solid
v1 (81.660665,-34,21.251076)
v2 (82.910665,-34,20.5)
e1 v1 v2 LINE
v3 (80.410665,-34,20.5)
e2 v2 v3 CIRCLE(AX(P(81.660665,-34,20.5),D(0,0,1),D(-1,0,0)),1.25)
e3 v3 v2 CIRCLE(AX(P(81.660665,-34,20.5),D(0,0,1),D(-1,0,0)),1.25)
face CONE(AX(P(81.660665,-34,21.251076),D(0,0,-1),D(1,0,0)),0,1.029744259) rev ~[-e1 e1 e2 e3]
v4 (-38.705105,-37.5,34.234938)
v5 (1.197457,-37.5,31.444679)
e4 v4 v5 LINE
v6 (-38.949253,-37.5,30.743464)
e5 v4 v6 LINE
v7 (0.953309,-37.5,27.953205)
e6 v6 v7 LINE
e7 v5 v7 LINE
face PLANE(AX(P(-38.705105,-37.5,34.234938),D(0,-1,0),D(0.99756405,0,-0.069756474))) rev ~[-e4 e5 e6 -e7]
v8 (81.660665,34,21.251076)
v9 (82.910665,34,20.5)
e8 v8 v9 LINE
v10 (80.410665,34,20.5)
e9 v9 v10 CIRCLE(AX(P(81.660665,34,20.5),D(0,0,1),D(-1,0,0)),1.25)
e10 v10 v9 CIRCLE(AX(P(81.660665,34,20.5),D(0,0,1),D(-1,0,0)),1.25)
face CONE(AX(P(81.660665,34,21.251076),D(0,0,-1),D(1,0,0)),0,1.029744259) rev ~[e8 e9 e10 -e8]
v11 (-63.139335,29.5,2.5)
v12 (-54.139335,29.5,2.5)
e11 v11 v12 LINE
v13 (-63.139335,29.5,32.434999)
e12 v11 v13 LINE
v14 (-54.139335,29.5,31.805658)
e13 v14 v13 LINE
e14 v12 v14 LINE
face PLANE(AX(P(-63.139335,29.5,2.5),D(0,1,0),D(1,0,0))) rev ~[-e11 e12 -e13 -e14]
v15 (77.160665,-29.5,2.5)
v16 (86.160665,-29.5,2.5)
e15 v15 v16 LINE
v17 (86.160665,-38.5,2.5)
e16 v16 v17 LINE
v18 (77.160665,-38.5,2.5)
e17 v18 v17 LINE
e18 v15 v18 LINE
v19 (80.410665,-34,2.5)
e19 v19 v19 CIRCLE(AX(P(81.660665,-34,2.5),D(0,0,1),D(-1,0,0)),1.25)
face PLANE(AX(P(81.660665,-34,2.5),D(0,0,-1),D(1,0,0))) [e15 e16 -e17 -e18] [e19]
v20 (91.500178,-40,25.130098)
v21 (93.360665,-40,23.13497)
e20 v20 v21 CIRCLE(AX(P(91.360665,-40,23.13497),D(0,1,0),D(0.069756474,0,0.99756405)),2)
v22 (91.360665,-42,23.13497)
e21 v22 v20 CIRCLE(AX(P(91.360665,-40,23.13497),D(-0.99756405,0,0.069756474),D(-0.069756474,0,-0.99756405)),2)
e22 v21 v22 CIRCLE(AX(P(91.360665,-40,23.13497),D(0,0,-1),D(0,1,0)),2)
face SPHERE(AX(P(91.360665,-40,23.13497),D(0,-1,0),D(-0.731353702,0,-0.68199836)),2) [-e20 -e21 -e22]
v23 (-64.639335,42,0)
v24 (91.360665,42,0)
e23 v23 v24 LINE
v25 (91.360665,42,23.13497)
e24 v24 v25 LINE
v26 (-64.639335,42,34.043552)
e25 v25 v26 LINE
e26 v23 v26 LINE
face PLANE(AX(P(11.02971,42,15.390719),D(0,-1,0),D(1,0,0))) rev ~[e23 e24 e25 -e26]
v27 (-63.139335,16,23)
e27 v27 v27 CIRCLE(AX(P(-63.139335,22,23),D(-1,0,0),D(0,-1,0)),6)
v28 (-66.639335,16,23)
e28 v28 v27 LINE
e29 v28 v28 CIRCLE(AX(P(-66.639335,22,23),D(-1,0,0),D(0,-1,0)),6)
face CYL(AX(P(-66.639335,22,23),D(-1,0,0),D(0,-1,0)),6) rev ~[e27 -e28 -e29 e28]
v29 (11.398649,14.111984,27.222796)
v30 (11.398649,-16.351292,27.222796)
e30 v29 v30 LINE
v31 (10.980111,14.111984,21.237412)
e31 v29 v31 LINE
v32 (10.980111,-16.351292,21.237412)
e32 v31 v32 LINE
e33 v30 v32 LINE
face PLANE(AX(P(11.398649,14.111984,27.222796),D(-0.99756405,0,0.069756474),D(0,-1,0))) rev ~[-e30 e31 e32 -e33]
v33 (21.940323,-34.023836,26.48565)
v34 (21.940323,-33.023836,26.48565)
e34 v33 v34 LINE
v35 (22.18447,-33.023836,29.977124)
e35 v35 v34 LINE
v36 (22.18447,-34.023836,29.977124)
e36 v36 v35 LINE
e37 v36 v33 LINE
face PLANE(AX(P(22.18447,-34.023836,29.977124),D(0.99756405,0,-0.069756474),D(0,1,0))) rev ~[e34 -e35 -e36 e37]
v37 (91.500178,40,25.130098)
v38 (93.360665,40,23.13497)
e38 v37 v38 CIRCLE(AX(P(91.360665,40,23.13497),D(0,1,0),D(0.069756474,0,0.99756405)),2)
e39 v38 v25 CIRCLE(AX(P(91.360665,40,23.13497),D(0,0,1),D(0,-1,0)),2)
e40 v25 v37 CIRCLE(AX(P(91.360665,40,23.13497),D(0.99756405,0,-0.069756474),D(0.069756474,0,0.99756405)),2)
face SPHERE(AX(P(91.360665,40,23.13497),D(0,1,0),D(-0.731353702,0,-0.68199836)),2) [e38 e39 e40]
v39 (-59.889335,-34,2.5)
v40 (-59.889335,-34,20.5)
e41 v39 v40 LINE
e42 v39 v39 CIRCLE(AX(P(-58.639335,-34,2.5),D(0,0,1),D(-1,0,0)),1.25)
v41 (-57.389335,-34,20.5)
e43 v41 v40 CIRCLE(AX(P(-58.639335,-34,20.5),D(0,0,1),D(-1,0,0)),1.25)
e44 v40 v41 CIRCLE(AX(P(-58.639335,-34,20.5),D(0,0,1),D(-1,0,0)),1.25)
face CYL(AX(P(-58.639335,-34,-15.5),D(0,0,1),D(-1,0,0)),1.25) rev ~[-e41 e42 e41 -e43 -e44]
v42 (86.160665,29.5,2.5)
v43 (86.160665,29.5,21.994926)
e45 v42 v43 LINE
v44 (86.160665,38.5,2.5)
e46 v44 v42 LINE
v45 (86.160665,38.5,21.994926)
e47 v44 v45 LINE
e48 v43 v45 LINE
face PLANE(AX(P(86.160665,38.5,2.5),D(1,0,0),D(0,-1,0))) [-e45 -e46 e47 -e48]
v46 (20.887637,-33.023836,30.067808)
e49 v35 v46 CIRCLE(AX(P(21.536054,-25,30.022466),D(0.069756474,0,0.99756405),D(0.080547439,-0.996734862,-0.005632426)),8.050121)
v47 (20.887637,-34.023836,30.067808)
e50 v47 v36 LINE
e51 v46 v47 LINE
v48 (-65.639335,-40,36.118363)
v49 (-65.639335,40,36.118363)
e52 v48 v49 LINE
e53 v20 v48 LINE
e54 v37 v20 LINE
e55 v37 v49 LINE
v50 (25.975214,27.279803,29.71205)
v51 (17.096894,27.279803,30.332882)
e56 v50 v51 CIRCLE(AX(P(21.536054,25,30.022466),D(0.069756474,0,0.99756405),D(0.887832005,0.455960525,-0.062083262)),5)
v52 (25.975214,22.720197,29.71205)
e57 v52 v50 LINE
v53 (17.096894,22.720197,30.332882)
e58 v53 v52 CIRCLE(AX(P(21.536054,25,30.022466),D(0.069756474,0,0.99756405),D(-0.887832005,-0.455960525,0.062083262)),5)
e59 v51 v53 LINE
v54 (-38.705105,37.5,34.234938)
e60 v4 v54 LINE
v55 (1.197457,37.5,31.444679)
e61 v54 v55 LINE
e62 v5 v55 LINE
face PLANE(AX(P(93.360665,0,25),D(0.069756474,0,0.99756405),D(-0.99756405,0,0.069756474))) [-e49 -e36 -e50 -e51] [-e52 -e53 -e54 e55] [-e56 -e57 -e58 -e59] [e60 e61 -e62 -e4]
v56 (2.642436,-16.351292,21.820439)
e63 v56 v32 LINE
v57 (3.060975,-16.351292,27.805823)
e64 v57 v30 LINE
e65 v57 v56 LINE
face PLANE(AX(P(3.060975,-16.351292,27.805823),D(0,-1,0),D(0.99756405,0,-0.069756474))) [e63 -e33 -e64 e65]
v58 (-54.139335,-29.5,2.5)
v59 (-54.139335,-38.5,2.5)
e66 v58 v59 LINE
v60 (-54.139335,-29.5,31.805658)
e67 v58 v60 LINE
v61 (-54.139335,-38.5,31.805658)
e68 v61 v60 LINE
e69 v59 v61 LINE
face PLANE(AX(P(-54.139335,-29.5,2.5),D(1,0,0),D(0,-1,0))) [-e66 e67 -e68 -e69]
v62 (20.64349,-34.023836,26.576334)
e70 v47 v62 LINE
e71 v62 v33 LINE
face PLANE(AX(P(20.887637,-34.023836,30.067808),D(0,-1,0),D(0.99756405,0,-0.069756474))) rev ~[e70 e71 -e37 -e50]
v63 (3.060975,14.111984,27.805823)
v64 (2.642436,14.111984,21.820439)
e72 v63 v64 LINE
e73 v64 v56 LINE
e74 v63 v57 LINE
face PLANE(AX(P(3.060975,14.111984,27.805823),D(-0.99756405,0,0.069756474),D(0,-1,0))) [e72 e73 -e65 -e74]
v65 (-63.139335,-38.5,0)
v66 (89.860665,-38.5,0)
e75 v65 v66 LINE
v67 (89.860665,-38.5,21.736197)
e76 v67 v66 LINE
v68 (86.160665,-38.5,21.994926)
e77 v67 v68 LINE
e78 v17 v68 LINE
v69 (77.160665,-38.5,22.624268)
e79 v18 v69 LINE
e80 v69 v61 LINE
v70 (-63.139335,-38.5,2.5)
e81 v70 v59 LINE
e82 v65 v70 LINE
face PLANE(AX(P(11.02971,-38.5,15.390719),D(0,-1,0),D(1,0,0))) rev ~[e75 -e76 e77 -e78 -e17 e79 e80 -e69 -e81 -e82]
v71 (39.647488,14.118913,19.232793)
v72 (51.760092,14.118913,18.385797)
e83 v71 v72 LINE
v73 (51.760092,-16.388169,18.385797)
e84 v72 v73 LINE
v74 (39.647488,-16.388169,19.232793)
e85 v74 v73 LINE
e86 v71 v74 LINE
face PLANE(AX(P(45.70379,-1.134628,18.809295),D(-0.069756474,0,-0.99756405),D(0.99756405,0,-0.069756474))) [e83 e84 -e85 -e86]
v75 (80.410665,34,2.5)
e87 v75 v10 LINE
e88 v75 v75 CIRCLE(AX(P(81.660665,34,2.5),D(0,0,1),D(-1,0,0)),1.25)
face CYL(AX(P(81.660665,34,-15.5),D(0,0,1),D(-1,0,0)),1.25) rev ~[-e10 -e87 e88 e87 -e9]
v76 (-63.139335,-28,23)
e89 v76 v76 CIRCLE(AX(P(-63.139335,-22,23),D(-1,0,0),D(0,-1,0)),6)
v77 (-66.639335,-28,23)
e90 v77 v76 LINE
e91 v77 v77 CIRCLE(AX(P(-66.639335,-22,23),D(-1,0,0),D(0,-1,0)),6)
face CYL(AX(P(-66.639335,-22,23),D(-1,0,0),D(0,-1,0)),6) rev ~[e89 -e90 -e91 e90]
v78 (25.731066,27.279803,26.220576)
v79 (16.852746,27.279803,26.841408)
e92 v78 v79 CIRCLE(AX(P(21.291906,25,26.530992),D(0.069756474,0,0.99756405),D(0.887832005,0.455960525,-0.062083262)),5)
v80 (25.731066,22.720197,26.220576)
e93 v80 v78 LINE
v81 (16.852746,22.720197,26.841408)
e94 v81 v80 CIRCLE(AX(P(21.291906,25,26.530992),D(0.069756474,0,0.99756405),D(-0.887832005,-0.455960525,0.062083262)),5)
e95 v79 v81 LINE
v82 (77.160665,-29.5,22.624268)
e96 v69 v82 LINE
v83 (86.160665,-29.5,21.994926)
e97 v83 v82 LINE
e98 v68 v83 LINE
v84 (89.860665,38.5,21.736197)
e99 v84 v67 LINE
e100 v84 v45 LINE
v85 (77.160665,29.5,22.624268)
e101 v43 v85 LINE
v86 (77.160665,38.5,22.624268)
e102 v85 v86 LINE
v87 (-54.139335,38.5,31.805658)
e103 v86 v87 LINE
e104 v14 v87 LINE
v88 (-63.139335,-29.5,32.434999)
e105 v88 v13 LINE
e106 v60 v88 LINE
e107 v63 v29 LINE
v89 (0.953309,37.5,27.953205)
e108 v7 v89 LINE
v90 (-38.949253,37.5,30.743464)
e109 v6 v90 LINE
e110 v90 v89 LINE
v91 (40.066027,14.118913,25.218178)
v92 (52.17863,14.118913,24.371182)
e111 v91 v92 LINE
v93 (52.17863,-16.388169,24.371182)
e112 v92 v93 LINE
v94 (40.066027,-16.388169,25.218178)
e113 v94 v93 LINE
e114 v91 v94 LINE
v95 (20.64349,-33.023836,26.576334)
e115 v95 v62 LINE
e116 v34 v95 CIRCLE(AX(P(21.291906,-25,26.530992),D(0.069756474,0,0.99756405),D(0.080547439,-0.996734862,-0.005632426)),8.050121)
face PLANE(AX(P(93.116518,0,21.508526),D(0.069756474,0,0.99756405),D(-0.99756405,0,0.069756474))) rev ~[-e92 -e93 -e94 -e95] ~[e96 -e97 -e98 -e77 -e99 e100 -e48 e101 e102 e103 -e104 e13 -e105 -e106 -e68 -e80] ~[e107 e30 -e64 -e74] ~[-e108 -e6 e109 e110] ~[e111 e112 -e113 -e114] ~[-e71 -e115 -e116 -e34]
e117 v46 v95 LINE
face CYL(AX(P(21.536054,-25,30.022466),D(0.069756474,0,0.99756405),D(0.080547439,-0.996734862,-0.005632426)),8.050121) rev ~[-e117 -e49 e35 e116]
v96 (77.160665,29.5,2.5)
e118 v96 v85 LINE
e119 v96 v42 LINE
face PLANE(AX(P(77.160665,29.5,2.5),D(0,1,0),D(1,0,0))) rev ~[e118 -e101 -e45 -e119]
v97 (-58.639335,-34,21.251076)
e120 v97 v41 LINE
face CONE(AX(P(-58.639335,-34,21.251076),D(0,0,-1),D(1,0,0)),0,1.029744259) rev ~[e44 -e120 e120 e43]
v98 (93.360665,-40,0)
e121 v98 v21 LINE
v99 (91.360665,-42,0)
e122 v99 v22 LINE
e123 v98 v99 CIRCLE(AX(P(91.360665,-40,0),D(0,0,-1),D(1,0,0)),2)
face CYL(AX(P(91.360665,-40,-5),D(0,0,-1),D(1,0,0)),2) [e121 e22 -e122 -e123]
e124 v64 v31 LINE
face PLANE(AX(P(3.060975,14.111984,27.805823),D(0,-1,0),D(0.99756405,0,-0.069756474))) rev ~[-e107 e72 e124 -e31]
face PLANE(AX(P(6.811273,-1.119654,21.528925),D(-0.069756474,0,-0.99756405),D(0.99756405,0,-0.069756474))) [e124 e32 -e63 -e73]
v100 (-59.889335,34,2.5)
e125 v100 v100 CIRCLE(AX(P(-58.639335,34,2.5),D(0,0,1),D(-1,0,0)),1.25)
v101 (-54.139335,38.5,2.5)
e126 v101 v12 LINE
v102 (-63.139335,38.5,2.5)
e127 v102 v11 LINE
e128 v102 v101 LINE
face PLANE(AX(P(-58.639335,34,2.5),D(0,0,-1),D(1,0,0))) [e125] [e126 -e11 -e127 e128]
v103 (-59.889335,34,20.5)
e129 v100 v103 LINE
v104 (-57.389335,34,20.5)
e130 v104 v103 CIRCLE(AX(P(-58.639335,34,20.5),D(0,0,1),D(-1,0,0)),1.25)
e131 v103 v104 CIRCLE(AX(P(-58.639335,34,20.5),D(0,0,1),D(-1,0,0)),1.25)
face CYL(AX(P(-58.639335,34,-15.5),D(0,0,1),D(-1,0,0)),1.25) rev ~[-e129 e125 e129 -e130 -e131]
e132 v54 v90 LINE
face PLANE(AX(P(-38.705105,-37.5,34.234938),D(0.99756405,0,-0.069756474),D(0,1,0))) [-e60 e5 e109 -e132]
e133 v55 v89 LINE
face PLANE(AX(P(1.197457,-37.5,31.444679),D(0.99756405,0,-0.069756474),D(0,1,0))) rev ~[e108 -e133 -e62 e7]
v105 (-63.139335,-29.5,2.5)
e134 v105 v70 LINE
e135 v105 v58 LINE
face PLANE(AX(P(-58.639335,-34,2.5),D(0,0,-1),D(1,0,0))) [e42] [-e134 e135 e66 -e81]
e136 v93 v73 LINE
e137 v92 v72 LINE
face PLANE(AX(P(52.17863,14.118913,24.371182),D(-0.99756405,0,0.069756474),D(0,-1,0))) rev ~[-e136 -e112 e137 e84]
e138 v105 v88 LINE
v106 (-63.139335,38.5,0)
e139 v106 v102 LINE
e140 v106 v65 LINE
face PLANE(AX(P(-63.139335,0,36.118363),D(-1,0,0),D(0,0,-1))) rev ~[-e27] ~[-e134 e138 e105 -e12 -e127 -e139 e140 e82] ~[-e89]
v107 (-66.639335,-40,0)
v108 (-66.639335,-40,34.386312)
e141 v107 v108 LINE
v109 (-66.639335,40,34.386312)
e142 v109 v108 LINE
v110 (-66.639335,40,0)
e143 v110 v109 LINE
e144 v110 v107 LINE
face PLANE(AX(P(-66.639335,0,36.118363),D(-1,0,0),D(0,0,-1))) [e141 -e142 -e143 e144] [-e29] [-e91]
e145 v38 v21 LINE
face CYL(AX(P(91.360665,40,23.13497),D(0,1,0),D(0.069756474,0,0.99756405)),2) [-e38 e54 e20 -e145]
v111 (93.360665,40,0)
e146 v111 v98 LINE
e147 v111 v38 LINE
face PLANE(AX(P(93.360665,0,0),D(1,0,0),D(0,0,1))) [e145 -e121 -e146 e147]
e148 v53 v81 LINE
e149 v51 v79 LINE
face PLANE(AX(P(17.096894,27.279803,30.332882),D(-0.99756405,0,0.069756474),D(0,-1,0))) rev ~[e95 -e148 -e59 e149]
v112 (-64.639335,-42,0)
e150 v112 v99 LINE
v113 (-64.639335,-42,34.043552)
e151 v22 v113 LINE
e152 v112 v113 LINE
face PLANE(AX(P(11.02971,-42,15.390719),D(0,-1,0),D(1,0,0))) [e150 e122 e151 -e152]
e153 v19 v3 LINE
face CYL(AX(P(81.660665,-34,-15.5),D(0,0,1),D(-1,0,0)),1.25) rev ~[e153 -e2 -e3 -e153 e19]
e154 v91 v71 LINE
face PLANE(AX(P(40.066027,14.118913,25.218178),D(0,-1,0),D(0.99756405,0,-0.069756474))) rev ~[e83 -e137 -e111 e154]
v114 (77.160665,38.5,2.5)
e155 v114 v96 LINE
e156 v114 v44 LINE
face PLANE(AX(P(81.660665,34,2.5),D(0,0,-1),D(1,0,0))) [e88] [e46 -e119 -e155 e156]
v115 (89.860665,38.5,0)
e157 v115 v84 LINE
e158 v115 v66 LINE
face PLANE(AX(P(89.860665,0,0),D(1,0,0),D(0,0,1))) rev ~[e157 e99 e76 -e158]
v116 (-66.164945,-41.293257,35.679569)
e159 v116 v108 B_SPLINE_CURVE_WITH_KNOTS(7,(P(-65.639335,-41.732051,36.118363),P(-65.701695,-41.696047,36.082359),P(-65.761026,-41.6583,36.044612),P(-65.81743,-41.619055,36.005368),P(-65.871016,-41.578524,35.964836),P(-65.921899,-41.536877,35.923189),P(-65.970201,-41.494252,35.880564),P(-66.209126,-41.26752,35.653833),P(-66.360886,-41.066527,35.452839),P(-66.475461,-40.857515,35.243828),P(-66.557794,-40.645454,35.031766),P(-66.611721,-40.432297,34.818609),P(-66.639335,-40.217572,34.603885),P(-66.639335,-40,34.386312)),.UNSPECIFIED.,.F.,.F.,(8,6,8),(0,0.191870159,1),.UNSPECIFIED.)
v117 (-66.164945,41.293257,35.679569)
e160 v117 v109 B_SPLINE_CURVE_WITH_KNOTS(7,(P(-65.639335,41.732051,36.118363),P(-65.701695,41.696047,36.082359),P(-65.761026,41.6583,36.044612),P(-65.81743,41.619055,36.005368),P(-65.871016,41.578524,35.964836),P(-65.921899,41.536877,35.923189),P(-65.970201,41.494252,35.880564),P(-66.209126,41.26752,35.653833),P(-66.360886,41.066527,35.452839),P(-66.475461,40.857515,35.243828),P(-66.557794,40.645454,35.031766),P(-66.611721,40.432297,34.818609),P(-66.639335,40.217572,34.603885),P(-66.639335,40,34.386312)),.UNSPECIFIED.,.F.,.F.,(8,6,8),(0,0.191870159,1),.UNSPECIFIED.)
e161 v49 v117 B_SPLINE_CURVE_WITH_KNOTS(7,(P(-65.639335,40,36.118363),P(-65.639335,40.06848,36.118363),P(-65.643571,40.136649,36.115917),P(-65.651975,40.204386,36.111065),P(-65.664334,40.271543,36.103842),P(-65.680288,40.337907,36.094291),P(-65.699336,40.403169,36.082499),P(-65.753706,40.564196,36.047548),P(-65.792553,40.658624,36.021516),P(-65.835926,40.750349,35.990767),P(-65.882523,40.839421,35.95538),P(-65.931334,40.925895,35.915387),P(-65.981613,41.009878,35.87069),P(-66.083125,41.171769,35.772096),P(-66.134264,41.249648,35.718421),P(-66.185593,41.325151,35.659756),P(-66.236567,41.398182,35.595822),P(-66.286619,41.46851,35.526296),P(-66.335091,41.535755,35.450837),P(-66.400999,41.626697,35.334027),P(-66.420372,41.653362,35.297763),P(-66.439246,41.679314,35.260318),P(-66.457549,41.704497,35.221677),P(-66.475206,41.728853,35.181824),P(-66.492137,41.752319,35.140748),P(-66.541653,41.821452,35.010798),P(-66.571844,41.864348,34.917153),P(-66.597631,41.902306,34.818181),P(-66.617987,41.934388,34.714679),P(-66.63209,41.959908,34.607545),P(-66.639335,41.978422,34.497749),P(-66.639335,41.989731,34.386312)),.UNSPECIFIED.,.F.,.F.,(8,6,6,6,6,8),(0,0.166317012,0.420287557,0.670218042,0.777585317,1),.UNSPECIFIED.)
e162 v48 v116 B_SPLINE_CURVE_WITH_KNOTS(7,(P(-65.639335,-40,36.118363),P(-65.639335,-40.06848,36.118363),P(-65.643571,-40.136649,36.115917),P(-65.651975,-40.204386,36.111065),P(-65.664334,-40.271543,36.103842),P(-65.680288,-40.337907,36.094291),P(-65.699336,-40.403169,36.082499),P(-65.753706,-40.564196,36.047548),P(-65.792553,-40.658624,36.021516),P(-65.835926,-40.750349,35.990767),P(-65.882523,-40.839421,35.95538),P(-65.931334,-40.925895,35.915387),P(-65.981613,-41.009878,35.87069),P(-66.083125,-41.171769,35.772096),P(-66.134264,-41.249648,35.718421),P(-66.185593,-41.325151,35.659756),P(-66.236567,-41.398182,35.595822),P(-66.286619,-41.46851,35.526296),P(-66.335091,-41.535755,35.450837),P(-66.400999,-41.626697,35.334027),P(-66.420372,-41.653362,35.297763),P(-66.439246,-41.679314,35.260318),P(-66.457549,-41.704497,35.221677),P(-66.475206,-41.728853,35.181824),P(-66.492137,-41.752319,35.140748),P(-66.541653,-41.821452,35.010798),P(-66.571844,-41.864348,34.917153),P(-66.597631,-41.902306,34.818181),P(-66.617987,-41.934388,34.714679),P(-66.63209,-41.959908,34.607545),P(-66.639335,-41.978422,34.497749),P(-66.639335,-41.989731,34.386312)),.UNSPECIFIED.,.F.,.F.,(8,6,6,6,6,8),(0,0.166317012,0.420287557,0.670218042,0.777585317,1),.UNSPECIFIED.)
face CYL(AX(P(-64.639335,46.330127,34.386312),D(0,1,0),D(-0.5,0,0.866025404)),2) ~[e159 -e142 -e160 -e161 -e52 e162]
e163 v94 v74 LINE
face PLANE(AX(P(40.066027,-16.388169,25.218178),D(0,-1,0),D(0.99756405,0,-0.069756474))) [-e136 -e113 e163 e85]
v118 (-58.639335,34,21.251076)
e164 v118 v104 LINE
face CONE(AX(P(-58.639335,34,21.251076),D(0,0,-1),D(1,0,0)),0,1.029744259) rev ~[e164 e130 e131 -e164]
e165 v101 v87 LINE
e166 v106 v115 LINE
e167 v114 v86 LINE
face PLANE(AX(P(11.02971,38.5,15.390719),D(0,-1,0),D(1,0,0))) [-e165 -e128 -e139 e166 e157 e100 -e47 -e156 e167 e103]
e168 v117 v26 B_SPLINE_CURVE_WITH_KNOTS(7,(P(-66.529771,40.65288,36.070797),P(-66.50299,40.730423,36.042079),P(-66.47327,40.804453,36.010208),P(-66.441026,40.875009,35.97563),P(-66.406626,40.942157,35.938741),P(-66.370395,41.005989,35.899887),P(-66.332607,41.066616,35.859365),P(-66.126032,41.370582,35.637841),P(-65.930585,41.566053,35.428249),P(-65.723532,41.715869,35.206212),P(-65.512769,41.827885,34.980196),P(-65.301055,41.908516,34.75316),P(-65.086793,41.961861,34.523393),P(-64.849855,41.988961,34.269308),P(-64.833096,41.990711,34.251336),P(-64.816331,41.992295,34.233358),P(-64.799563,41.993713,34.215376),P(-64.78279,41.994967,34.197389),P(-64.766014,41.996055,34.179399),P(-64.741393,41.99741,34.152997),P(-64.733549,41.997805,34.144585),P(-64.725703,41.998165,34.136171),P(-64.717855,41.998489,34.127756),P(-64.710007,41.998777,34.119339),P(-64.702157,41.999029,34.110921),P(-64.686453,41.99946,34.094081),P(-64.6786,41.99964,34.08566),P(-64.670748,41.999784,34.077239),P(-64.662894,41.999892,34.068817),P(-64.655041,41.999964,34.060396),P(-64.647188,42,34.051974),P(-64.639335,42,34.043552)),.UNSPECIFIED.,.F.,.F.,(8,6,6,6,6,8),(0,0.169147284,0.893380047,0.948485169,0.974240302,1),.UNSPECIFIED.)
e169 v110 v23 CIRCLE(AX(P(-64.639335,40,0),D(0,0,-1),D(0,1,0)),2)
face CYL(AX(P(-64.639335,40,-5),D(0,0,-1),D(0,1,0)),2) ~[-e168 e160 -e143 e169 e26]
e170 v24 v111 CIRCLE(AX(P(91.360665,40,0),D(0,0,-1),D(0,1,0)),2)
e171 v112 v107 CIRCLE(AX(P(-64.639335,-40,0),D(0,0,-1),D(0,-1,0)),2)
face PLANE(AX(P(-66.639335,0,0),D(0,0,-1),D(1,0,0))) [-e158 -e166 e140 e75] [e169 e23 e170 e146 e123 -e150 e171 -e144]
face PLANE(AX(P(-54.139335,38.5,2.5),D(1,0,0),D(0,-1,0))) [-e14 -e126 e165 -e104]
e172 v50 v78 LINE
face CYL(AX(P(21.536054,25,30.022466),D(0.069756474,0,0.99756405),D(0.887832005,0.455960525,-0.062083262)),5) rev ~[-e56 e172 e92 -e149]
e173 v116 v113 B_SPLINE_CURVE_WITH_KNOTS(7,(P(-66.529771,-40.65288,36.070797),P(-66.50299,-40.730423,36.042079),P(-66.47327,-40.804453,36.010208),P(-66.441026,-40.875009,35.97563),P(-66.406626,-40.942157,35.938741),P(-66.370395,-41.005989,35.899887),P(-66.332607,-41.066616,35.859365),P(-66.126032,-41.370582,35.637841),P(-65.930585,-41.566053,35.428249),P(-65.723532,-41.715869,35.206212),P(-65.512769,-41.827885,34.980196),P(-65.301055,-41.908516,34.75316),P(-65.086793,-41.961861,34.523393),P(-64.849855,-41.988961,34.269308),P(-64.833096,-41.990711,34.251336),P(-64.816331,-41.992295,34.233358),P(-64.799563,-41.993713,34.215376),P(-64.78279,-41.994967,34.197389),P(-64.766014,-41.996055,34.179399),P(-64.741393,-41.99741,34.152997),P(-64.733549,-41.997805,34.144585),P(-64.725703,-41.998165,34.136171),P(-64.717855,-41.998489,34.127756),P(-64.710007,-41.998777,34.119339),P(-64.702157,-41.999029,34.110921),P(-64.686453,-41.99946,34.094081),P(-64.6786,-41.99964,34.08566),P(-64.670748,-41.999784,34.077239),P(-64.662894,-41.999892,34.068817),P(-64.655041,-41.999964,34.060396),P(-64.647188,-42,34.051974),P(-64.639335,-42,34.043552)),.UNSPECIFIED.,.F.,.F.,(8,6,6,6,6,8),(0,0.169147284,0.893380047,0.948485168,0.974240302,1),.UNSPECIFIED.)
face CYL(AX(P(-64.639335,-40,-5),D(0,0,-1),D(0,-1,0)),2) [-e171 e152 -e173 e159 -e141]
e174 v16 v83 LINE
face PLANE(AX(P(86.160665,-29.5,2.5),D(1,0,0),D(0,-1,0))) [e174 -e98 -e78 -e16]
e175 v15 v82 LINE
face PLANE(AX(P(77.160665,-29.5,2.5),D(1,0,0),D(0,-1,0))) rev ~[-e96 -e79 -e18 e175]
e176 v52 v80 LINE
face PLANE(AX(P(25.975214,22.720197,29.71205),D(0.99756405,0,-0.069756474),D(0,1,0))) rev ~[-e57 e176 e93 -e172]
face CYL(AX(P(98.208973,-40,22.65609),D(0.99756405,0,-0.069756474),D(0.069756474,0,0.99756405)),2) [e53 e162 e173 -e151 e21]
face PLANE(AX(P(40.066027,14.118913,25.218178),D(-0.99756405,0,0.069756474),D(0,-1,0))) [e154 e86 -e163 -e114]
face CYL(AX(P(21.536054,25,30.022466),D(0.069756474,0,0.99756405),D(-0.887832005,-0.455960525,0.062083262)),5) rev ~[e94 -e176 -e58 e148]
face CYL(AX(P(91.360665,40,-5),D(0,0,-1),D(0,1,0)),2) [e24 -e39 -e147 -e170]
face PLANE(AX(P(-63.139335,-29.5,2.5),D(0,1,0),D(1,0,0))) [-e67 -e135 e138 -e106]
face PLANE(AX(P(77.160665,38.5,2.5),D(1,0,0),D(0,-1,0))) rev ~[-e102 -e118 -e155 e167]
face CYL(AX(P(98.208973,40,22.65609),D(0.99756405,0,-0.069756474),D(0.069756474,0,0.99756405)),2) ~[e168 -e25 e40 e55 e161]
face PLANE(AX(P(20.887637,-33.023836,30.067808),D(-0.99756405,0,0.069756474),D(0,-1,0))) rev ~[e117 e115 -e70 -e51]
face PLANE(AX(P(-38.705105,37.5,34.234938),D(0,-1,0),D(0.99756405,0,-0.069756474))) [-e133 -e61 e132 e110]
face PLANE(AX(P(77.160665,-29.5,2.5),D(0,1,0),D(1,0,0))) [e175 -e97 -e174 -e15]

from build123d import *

# Parameters (mm, degrees)
F1_DEPTH      = 42
F2_T          = -3.5
F3_W          = 40
F3_H          = 75
F4_DEPTH      = 4
F6_DEPTH      = 5
F8_W          = 9
F8_H          = 9
F9_DEPTH      = 20.5
F10_DEPTH     = 32
F12_R         = 6
F13_DEPTH     = 25
F15_W         = 8.3580343053
F15_H         = 30.4632759653
F15_W_2       = 12.1421813965
F15_H_2       = 30.5070821196
F16_DEPTH     = 6
F17_T1_DEPTH  = 169.3882617949
F17_T3_DEPTH  = 92.6602540378
F17_T5_DEPTH  = 46.118363099
F17_T7_DEPTH  = 35
F18_D         = 2.5
F18_DEPTH     = 18
F18_TIP       = 0.7510757738
F19_T1_DEPTH  = 80
F19_T6_DEPTH  = 2
F19_T12_DEPTH = 2
F20_D         = 2.5
F20_DEPTH     = 18
F20_TIP       = 0.7510757738


# Not quite as in the source:
# - a fillet or chamfer that OpenCascade refuses, or shapes differently, is made with other operations: its cross-section is extruded or revolved along the edge and cut away or added
# - a feature names something its author has since deleted; it is built from what else it names


with BuildPart() as f1:
    # F0 (on Front) → F1 (new body, symmetric)
    with BuildSketch(Plane.XZ):
        Polygon((-66.6393345791, 36.118363099), (-66.6393345791, 0), (93.3606654209, 0), (93.3606654209, 25), (-65.6393345791, 36.118363099), align=None)
    extrude(amount=F1_DEPTH, both=True)

    # F2
    f2_openings = [f1.faces().sort_by_distance(p)[0] for p in [
        (13.360665, 0, 0),
    ]]
    offset(amount=F2_T, openings=f2_openings)

    # F3 (on face) → F4 (cut)
    with BuildSketch(Plane(origin=(2.1939535511, 0, 31.3749975164), x_dir=(0.9975640503, 0, -0.0697564737), z_dir=(0.0697564737, 0, 0.9975640503))):
        with Locations((-20.9989301063, 0)):
            Rectangle(F3_W, F3_H)
    extrude(amount=-F4_DEPTH, mode=Mode.SUBTRACT)

    # F3 (on face) → F6 (cut)
    with BuildSketch(Plane(origin=(2.1939535511, 0, 31.3749975164), x_dir=(0.9975640503, 0, -0.0697564737), z_dir=(0.0697564737, 0, 0.9975640503))):
        with BuildLine():
            Line((14.9393316886, 27.279802623), (14.9393316886, 22.720197377))
            ThreePointArc((14.9393316886, 22.720197377), (19.3893316886, 20), (23.8393316886, 22.720197377))
            Line((23.8393316886, 22.720197377), (23.8393316886, 27.279802623))
            ThreePointArc((23.8393316886, 27.279802623), (19.3893316886, 30), (14.9393316886, 27.279802623))
        make_face()
        with BuildLine():
            Line((20.0393316886, -34.0238362551), (20.0393316886, -33.0238362551))
            ThreePointArc((20.0393316886, -33.0238362551), (19.3893316886, -16.9498789917), (18.7393316886, -33.0238362551))
            Line((18.7393316886, -33.0238362551), (18.7393316886, -34.0238362551))
            Line((18.7393316886, -34.0238362551), (20.0393316886, -34.0238362551))
        make_face()
    extrude(amount=-F6_DEPTH, mode=Mode.SUBTRACT)

    # F8 (on offset) → F9 (join)
    with BuildSketch(Plane(origin=(0, 0, 2.5), x_dir=(1, 0, 0), z_dir=(0, 0, -1))):
        with Locations((81.6606654209, 34)):
            Rectangle(F8_W, F8_H)
        with Locations((81.6606654209, -34)):
            Rectangle(F8_W, F8_H)
    extrude(amount=-F9_DEPTH)

    # F8 (on offset) → F10 (join)
    with BuildSketch(Plane(origin=(0, 0, 2.5), x_dir=(1, 0, 0), z_dir=(0, 0, -1))):
        with Locations((-58.6393345791, -34)):
            Rectangle(F8_W, F8_H)
        with Locations((-58.6393345791, 34)):
            Rectangle(F8_W, F8_H)
    extrude(amount=-F10_DEPTH)

    # F12 (on offset) → F13 (cut)
    with BuildSketch(Plane(origin=(-66.6393345791, 0, 0), x_dir=(0, -1, 0), z_dir=(-1, 0, 0))):
        with Locations((-22, 23)):
            Circle(F12_R)
        with Locations((22, 23)):
            Circle(F12_R)
    extrude(amount=-F13_DEPTH, mode=Mode.SUBTRACT)

    # F15 (on offset) → F16 (join)
    with BuildSketch(Plane(origin=(1.949805893, 0, 27.8835233405), x_dir=(0.9975640503, 0, -0.0697564737), z_dir=(-0.0697564737, 0, -0.9975640503))):
        with Locations((5.292899441, 1.1196539272)):
            Rectangle(F15_W, F15_H)
        with Locations((44.2803874612, 1.1346279643)):
            Rectangle(F15_W_2, F15_H_2)
    extrude(amount=F16_DEPTH)

    # F17: fillet of radius 2 on 7 edges, made by hand

    # F17_s2 → F17_t1 (cut)
    with BuildSketch(Plane(origin=(96.1545321211, 0, -6.7237798852), x_dir=(0, 1, 0), z_dir=(-0.9975640503, 0, 0.0697564737))):
        with BuildLine():
            ThreePointArc((40, -31.4516120627), (41.4142135624, -30.865825625), (42, -29.4516120627))
            Line((42, -29.4516120627), (42, -31.4516120627))
            Line((42, -31.4516120627), (40, -31.4516120627))
        make_face()
        with BuildLine():
            ThreePointArc((-40, -31.4516120627), (-41.4142135624, -30.865825625), (-42, -29.4516120627))
            Line((-42, -29.4516120627), (-42, -31.4516120627))
            Line((-42, -31.4516120627), (-40, -31.4516120627))
        make_face()
    extrude(amount=F17_T1_DEPTH, mode=Mode.SUBTRACT)

    # F17_s4 → F17_t3 (cut)
    with BuildSketch(Plane.XZ.offset(-46.3301270189)):
        with BuildLine():
            ThreePointArc((-65.6393345791, 36.118363099), (-66.3713853867, 35.3863122914), (-66.6393345791, 34.3863122914))
            Line((-66.6393345791, 34.3863122914), (-66.6393345791, 36.118363099))
            Line((-66.6393345791, 36.118363099), (-65.6393345791, 36.118363099))
        make_face()
    extrude(amount=F17_T3_DEPTH, mode=Mode.SUBTRACT)

    # F17_s6 → F17_t5 (cut)
    with BuildSketch(Plane.XY.offset(-5)):
        with BuildLine():
            ThreePointArc((-64.6393345791, 42), (-66.0535481415, 41.4142135624), (-66.6393345791, 40))
            Line((-66.6393345791, 40), (-66.6393345791, 42))
            Line((-66.6393345791, 42), (-64.6393345791, 42))
        make_face()
        with BuildLine():
            ThreePointArc((-64.6393345791, -42), (-66.0535481415, -41.4142135624), (-66.6393345791, -40))
            Line((-66.6393345791, -40), (-66.6393345791, -42))
            Line((-66.6393345791, -42), (-64.6393345791, -42))
        make_face()
    extrude(amount=F17_T5_DEPTH, mode=Mode.SUBTRACT)

    # F17_s8 → F17_t7 (cut)
    with BuildSketch(Plane.XY.offset(-5)):
        with BuildLine():
            ThreePointArc((91.3606654209, 42), (92.7748789833, 41.4142135624), (93.3606654209, 40))
            Line((93.3606654209, 40), (93.3606654209, 42))
            Line((93.3606654209, 42), (91.3606654209, 42))
        make_face()
        with BuildLine():
            ThreePointArc((93.3606654209, -40), (92.7748789833, -41.4142135624), (91.3606654209, -42))
            Line((91.3606654209, -42), (93.3606654209, -42))
            Line((93.3606654209, -42), (93.3606654209, -40))
        make_face()
    extrude(amount=F17_T7_DEPTH, mode=Mode.SUBTRACT)

    # F18
    with Locations(Plane(origin=(0, 0, 2.5), x_dir=(1, 0, 0), z_dir=(0, 0, -1))):
        with Locations((-58.6393345791, 34), (-58.6393345791, -34)):
            Hole(F18_D / 2, depth=F18_DEPTH)
            with Locations((0, 0, -(F18_DEPTH + F18_TIP / 2))):  # 118° drill point
                Cone(0, F18_D / 2, F18_TIP, mode=Mode.SUBTRACT)

    # F19: fillet of radius 2 on 1 edges, made by hand

    # F19_s2 → F19_t1 (cut)
    with BuildSketch(Plane.XZ.offset(-40)):
        with BuildLine():
            ThreePointArc((91.5001783684, 25.1300979282), (92.8233728241, 24.4989665478), (93.3606654209, 23.1349698277))
            Line((93.3606654209, 23.1349698277), (93.3606654209, 25))
            Line((93.3606654209, 25), (91.5001783684, 25.1300979282))
        make_face()
    extrude(amount=F19_T1_DEPTH, mode=Mode.SUBTRACT)


with BuildPart() as f19_tool4:
    # F19_s5 → F19_t6 (new body)
    with BuildSketch(Plane.XZ.offset(40)):
        Polygon((91.3606654209, 23.1349698277), (91.5001783684, 25.1300979282), (93.3606654209, 25), (93.3606654209, 23.1349698277), align=None)
    extrude(amount=F19_T6_DEPTH)

    # F19_s7 → F19_t8 (revolve, cut)
    with BuildSketch(Plane(origin=(91.3606654209, -40, 23.1349698277), x_dir=(-0.7313537016, 0, -0.6819983601), z_dir=(-0.6819983601, 0, 0.7313537016))):
        with BuildLine():
            ThreePointArc((0, -2), (2, 0), (0, 2))
            Line((0, 2), (0, -2))
        make_face()
    revolve(axis=Axis((91.3606654209, -40, 23.1349698277), (0, -1, 0)), mode=Mode.SUBTRACT)


with BuildPart() as f1_1:
    add(f1.part)

    # F19_t3: cut F19_tool4
    add(f19_tool4.part, mode=Mode.SUBTRACT)


with BuildPart() as f19_tool10:
    # F19_s11 → F19_t12 (new body)
    with BuildSketch(Plane.XZ.offset(-40)):
        Polygon((91.3606654209, 23.1349698277), (91.5001783684, 25.1300979282), (93.3606654209, 25), (93.3606654209, 23.1349698277), align=None)
    extrude(amount=-F19_T12_DEPTH)

    # F19_s13 → F19_t14 (revolve, cut)
    with BuildSketch(Plane(origin=(91.3606654209, 40, 23.1349698277), x_dir=(-0.7313537016, 0, -0.6819983601), z_dir=(0.6819983601, 0, -0.7313537016))):
        with BuildLine():
            ThreePointArc((0, -2), (2, 0), (0, 2))
            Line((0, 2), (0, -2))
        make_face()
    revolve(axis=Axis((91.3606654209, 40, 23.1349698277), (0, 1, 0)), mode=Mode.SUBTRACT)


with BuildPart() as f1_2:
    add(f1_1.part)

    # F19_t9: cut F19_tool10
    add(f19_tool10.part, mode=Mode.SUBTRACT)

    # F20
    with Locations(Plane(origin=(0, 0, 2.5), x_dir=(1, 0, 0), z_dir=(0, 0, -1))):
        with Locations((81.6606654209, 34), (81.6606654209, -34)):
            Hole(F20_D / 2, depth=F20_DEPTH)
            with Locations((0, 0, -(F20_DEPTH + F20_TIP / 2))):  # 118° drill point
                Cone(0, F20_D / 2, F20_TIP, mode=Mode.SUBTRACT)


solid = f1_2.part
